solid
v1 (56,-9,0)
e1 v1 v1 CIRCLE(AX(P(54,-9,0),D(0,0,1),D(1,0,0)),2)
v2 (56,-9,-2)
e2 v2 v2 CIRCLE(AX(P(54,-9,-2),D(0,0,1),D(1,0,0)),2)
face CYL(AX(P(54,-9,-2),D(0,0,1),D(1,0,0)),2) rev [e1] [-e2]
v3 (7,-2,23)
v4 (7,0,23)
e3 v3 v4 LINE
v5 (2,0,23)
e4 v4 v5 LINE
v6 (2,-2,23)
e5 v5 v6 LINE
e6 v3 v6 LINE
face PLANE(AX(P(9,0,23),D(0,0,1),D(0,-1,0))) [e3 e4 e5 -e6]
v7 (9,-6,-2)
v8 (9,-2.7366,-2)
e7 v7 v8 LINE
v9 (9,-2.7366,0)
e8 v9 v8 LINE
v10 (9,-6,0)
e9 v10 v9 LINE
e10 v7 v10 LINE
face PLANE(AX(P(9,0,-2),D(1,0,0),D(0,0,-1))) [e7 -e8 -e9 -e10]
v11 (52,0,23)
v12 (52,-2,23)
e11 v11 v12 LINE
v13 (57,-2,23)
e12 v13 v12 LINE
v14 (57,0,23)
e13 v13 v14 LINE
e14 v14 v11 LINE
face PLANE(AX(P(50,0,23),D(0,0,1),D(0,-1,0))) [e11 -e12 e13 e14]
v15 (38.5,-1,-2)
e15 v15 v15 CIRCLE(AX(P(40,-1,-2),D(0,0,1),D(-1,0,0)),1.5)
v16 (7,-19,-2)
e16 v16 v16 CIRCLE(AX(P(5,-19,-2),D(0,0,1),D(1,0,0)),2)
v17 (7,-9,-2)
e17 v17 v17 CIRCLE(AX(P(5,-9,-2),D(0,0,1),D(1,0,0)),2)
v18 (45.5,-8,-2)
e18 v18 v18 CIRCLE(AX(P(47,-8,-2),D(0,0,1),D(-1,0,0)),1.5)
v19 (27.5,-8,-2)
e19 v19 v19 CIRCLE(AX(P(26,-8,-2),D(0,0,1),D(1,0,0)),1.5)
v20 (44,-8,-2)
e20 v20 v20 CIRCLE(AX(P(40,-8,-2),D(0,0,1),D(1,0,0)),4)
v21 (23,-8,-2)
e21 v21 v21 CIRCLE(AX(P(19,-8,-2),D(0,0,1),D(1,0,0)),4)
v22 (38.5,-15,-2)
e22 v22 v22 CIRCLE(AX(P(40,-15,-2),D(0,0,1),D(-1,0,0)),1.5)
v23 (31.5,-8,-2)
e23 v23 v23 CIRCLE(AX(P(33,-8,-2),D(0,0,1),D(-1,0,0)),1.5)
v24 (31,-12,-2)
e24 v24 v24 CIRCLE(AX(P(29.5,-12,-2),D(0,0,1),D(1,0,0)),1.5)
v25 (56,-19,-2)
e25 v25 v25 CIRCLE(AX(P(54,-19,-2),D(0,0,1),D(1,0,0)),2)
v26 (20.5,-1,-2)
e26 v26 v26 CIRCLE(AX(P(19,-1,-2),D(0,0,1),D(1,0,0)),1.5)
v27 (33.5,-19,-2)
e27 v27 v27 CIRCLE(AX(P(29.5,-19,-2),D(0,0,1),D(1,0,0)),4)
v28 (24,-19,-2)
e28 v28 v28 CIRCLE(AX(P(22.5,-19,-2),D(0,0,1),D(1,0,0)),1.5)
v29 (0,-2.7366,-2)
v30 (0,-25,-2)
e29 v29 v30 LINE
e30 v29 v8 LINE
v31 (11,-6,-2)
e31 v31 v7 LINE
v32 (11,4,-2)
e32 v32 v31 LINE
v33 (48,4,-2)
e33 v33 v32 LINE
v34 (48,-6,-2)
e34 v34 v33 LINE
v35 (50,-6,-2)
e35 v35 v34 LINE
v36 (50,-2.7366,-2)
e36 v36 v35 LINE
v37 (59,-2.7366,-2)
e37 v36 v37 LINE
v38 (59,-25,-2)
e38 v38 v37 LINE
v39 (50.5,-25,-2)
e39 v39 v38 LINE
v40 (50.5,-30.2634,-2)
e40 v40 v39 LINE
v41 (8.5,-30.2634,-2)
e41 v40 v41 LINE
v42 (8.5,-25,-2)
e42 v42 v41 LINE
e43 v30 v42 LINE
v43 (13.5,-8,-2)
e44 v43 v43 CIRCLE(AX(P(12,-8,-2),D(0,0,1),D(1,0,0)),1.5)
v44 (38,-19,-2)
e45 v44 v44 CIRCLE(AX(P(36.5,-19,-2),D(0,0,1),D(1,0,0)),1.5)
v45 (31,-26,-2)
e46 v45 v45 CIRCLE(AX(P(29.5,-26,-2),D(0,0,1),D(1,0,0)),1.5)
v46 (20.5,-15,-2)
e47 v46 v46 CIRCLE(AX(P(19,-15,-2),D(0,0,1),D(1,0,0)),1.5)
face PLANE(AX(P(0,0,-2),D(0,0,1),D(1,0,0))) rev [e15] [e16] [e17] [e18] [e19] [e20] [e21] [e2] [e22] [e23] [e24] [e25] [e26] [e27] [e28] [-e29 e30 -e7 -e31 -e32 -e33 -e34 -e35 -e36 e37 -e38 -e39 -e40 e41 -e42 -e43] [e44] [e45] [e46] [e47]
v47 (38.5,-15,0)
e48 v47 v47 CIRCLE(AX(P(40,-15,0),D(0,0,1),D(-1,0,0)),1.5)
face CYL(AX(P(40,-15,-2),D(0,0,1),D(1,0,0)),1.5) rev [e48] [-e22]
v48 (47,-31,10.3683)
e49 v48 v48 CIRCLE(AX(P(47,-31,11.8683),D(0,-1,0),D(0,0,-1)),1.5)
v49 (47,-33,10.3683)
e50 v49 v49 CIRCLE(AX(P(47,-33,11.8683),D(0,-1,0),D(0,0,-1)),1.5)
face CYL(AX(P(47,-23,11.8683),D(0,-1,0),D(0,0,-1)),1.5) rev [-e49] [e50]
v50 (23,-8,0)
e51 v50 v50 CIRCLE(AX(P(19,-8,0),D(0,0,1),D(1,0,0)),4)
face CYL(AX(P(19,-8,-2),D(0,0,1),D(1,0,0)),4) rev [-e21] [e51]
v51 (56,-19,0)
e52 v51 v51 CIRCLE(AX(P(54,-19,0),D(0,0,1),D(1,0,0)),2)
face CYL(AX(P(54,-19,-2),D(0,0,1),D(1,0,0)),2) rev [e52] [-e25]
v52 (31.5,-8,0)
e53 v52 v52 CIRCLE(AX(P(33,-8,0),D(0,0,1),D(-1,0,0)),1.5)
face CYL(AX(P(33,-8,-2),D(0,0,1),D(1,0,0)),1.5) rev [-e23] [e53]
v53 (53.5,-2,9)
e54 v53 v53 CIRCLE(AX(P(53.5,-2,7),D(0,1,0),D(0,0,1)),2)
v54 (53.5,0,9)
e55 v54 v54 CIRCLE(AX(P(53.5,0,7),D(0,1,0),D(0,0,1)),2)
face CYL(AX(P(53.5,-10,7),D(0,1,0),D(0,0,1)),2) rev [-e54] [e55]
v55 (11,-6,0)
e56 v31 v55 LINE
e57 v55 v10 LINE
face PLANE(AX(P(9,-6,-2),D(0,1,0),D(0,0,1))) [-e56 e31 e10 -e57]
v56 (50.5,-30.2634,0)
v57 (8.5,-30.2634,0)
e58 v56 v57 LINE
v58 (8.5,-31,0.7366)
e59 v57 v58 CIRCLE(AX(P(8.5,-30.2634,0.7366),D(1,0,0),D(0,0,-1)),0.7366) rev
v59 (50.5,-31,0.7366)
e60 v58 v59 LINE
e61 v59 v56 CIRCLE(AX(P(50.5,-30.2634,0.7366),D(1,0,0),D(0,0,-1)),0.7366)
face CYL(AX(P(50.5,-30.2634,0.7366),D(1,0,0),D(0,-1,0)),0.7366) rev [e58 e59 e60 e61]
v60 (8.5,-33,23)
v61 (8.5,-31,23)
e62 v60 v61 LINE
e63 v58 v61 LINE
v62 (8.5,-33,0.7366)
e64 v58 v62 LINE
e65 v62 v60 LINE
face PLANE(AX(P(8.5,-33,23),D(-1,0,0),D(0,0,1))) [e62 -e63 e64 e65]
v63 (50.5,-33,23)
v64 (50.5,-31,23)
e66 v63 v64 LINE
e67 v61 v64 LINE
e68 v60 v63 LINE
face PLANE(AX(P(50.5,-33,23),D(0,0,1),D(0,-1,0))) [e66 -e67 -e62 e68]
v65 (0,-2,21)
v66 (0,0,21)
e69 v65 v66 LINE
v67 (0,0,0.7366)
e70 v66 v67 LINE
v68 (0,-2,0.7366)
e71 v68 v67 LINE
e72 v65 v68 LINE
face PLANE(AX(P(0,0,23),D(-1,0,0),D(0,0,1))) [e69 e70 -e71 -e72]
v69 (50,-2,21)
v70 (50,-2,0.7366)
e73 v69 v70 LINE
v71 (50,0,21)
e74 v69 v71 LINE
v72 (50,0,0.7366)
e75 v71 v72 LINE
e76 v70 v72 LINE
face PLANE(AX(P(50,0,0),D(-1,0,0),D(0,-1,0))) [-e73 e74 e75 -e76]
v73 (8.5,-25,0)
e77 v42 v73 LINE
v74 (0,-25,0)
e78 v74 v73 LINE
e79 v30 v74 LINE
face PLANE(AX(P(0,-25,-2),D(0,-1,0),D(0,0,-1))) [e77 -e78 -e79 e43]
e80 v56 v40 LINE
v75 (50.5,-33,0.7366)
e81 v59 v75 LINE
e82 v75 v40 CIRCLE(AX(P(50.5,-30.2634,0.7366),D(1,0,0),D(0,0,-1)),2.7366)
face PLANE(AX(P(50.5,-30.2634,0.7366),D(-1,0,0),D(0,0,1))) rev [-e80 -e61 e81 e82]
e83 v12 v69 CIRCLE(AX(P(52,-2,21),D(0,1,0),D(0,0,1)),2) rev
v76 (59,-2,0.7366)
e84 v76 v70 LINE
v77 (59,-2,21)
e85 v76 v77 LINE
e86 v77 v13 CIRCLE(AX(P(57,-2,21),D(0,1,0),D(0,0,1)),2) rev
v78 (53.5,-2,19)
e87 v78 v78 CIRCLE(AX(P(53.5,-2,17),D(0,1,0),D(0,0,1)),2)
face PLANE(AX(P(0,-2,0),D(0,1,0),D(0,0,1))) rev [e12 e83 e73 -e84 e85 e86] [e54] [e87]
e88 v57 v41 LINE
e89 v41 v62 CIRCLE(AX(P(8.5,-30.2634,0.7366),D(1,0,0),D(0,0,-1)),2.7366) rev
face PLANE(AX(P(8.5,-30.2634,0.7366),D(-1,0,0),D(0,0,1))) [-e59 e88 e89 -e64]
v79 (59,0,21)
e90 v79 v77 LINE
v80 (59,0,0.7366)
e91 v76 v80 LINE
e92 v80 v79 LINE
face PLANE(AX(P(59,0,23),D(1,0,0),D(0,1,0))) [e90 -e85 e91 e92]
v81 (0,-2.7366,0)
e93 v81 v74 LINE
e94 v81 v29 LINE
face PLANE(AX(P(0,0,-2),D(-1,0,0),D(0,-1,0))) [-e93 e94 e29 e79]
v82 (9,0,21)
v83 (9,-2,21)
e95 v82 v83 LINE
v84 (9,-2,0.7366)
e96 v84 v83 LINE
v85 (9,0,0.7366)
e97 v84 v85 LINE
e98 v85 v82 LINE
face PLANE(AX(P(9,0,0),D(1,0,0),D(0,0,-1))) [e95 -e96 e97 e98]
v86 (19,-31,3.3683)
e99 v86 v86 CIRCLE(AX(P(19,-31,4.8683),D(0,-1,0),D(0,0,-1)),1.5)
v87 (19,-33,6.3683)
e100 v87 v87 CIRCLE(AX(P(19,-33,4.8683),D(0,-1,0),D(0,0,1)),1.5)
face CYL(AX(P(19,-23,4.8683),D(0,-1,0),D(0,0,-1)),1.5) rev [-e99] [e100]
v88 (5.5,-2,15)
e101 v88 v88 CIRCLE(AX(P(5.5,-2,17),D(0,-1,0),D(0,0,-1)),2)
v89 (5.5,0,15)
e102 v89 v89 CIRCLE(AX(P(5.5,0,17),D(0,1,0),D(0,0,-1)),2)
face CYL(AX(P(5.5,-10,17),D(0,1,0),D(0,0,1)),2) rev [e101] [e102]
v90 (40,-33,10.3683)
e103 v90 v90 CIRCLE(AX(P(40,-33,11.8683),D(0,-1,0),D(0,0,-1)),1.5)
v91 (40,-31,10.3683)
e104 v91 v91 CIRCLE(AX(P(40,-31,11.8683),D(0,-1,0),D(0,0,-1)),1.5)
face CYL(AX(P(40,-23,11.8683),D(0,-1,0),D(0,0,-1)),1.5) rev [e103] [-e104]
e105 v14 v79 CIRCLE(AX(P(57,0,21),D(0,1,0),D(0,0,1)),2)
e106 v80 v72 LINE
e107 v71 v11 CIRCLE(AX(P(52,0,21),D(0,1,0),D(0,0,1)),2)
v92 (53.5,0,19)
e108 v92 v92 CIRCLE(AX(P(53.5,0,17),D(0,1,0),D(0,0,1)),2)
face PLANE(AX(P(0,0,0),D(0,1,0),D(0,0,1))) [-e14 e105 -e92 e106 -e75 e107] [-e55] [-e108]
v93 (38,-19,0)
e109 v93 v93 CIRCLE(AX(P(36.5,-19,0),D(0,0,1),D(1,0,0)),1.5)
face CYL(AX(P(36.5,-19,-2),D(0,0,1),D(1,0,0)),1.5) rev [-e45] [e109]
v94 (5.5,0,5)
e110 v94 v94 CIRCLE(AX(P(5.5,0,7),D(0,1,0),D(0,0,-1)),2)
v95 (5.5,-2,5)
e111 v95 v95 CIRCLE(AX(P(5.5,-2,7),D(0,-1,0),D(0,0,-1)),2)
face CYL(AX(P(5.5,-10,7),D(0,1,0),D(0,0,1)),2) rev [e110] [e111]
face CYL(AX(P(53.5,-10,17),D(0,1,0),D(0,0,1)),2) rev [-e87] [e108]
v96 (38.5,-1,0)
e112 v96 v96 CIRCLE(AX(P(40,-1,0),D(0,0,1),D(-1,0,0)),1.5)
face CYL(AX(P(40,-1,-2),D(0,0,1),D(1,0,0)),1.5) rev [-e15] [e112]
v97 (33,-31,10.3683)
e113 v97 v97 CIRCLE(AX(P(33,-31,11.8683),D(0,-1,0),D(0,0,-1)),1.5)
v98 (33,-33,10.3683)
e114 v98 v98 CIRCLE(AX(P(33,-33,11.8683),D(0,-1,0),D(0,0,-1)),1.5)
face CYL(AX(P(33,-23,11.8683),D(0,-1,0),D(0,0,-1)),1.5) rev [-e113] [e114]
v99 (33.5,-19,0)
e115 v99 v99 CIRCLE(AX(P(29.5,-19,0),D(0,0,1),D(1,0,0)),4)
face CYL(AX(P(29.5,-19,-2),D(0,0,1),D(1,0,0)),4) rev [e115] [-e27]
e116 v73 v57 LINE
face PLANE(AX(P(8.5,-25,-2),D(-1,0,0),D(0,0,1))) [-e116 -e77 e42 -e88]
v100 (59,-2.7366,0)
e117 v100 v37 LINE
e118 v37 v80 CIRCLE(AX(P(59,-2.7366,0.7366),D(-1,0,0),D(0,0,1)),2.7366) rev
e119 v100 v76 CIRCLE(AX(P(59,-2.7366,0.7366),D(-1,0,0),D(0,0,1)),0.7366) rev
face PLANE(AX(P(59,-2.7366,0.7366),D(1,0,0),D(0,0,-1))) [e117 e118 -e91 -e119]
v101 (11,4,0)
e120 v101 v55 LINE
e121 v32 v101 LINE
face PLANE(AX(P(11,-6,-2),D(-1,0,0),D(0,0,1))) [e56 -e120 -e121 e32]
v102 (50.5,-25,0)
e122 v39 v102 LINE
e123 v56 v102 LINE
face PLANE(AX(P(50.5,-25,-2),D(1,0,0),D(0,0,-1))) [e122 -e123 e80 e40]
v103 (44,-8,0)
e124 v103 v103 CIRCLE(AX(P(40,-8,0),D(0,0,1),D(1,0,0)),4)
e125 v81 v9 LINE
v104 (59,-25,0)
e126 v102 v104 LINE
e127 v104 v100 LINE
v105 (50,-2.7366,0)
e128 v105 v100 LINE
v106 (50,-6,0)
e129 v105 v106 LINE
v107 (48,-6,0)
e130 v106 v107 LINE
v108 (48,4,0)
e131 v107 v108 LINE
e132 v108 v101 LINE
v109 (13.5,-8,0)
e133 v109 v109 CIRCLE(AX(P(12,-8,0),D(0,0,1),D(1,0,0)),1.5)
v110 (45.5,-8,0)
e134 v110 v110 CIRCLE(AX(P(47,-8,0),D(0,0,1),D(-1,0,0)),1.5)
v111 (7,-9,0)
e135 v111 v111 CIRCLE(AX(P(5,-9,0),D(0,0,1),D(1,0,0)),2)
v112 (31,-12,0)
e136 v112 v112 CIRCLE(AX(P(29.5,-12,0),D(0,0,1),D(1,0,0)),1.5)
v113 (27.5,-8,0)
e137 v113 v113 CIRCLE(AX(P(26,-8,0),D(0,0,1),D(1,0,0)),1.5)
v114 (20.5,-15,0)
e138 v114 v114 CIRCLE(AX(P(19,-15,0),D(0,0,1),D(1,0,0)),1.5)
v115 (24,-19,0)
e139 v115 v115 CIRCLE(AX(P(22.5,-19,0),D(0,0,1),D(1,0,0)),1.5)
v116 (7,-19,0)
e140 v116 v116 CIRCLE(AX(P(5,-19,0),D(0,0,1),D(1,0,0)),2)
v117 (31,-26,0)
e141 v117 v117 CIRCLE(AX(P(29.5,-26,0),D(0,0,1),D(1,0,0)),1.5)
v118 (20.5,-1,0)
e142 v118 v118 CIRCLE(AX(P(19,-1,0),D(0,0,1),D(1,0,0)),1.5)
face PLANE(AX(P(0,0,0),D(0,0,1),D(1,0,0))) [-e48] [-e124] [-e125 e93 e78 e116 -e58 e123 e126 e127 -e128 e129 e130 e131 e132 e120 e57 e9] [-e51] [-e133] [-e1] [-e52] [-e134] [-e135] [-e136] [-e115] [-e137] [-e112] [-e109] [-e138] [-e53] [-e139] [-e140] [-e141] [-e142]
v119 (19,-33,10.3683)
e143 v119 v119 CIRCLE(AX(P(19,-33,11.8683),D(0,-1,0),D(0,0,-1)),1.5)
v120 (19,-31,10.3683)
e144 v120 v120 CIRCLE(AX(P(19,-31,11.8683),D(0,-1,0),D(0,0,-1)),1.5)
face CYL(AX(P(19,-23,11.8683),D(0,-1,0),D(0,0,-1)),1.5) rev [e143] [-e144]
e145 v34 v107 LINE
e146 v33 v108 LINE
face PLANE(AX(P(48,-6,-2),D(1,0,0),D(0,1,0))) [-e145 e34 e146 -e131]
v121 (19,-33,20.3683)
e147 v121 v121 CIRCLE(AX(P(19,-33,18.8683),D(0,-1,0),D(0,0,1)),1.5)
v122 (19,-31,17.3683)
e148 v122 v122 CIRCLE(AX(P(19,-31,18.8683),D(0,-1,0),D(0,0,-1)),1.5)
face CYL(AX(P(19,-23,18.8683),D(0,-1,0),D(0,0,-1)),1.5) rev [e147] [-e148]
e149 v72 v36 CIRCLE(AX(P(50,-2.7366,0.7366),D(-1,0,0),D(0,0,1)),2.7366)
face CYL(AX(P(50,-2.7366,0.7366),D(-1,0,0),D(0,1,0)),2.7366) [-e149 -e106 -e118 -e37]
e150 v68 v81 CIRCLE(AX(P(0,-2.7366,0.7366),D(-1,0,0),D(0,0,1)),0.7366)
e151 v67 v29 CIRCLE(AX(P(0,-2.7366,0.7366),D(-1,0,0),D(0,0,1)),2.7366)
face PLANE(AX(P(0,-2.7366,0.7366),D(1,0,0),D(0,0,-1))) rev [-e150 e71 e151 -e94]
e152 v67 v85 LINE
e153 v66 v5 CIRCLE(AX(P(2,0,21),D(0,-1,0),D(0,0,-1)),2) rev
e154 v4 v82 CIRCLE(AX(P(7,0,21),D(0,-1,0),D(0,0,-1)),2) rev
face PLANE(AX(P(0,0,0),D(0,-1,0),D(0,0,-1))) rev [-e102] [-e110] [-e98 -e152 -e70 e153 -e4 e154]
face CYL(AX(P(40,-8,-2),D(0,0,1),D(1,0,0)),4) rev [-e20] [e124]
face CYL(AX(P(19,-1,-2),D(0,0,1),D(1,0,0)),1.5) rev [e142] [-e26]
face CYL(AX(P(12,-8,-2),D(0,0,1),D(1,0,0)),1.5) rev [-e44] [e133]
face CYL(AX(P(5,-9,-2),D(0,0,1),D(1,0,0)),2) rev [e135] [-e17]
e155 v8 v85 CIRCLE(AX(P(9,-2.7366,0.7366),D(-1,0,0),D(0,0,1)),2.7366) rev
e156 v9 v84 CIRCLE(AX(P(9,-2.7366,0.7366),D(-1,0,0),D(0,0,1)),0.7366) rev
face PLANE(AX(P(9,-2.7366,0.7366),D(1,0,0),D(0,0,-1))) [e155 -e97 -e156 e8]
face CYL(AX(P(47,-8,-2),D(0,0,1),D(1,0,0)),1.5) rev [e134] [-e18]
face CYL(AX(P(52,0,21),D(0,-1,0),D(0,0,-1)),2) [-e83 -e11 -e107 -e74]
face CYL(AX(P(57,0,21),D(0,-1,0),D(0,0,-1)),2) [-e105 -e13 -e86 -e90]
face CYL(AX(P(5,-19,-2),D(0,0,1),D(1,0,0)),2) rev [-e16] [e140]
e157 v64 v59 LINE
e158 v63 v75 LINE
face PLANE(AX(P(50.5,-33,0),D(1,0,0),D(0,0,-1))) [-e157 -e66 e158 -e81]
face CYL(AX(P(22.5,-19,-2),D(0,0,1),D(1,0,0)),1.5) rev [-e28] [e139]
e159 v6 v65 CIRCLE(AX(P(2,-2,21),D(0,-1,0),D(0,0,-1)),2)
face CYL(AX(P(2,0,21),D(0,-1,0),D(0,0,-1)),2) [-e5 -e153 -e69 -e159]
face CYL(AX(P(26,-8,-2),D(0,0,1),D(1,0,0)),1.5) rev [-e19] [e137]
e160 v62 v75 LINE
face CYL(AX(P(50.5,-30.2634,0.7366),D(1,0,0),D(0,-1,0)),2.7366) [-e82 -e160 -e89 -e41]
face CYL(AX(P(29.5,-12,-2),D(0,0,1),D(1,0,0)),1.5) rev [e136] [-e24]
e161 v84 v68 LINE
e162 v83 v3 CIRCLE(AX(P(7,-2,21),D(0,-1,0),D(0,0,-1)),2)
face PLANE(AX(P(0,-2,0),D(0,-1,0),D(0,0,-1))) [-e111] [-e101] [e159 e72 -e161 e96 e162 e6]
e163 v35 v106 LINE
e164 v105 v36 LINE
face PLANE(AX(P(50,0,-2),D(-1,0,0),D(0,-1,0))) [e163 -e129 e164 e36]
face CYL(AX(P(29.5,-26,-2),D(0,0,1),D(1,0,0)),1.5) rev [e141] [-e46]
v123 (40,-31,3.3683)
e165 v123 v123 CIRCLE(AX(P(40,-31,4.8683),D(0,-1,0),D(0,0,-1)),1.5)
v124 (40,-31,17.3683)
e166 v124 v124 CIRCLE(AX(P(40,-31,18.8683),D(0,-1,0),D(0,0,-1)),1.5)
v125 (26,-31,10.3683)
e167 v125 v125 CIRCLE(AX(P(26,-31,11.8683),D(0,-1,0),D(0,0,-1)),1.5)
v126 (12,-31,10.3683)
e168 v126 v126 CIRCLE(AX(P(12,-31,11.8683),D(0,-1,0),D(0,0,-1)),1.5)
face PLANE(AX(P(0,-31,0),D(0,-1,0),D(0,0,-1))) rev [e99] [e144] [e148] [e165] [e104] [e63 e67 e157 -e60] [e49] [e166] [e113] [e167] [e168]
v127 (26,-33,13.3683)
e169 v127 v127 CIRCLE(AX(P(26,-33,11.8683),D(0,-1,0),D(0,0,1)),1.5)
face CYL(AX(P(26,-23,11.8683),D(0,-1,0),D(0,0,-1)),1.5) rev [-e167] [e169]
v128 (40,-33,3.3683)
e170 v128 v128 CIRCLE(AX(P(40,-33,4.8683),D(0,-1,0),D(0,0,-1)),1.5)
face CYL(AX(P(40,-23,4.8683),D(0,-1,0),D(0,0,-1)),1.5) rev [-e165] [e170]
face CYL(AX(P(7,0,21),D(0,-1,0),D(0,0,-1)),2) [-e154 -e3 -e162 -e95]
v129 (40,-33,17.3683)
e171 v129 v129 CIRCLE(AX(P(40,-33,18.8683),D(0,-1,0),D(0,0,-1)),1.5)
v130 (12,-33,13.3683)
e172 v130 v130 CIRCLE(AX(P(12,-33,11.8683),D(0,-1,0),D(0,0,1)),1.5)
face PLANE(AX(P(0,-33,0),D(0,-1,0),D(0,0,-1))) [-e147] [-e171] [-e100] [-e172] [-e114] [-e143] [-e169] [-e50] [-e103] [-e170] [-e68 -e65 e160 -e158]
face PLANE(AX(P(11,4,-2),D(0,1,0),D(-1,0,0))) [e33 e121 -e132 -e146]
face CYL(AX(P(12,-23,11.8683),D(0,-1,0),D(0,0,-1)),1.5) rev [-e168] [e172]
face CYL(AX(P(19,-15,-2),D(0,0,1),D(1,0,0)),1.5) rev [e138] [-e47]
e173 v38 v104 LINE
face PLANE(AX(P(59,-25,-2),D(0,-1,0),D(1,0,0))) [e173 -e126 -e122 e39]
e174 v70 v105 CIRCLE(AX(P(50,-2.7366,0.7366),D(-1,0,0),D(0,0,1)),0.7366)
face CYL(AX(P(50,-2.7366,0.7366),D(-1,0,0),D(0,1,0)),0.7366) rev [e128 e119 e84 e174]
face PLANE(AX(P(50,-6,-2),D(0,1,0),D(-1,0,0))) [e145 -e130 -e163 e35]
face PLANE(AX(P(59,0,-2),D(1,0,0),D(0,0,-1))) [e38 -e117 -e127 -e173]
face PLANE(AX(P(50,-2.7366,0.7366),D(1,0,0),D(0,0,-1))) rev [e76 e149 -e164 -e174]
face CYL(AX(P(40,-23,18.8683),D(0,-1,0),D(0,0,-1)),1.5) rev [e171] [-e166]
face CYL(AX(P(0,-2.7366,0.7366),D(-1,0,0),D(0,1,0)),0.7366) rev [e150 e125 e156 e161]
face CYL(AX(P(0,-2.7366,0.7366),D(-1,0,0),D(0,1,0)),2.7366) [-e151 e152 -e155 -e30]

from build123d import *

# Parameters (mm, degrees)
SKETCH_1_R                         = 4
SKETCH_1_R_2                       = 1.5
SKETCH_1_R_3                       = 2
SM_BASE_FLANGE_1_DEPTH             = 2
SM_EDGE_FLANGE_1_STRIP_W           = 9.4732
SM_EDGE_FLANGE_1_STRIP_H           = 2
SM_EDGE_FLANGE_1_STRIP_CUT_DEPTH   = 9
SM_EDGE_FLANGE_1_STRIP_2_W         = 9.4732
SM_EDGE_FLANGE_1_STRIP_2_H         = 2
SM_EDGE_FLANGE_1_STRIP_CUT_2_DEPTH = 9
SM_EDGE_FLANGE_1_DEPTH             = 9
SM_EDGE_FLANGE_1_BEND_DEPTH        = 9
SM_EDGE_FLANGE_2_STRIP_W           = 9.4732
SM_EDGE_FLANGE_2_STRIP_H           = 2
SM_EDGE_FLANGE_2_STRIP_CUT_DEPTH   = 42
SM_EDGE_FLANGE_2_DEPTH             = 42
SKETCH_15_R                        = 1.5
CUT_EXTRUDE_1_DEPTH                = 10
SKETCH_16_R                        = 2
CUT_EXTRUDE_2_DEPTH                = 10
FILLET_1_R                         = 2


# Sheet-metal steps are written as plain solids
with BuildPart() as part:
    # Sketch 1 → 基体-法兰1 (new body)
    with BuildSketch(Plane.XY):
        Polygon((0, 0), (9, 0), (9, -6), (11, -6), (11, 4), (48, 4), (48, -6), (50, -6), (50, 0), (59, 0), (59, -25), (50.5, -25), (50.5, -33), (8.5, -33), (8.5, -25), (0, -25), align=None)
        with Locations((19, -8)):
            Circle(SKETCH_1_R, mode=Mode.SUBTRACT)
        with Locations((40, -8)):
            Circle(SKETCH_1_R, mode=Mode.SUBTRACT)
        with Locations((29.5, -19)):
            Circle(SKETCH_1_R, mode=Mode.SUBTRACT)
        with Locations((19, -1)):
            Circle(SKETCH_1_R_2, mode=Mode.SUBTRACT)
        with Locations((19, -15)):
            Circle(SKETCH_1_R_2, mode=Mode.SUBTRACT)
        with Locations((26, -8)):
            Circle(SKETCH_1_R_2, mode=Mode.SUBTRACT)
        with Locations((12, -8)):
            Circle(SKETCH_1_R_2, mode=Mode.SUBTRACT)
        with Locations(Location((33, -8, 0), (0, 0, 180))):
            Circle(SKETCH_1_R_2, mode=Mode.SUBTRACT)
        with Locations(Location((40, -15, 0), (0, 0, 180))):
            Circle(SKETCH_1_R_2, mode=Mode.SUBTRACT)
        with Locations(Location((47, -8, 0), (0, 0, 180))):
            Circle(SKETCH_1_R_2, mode=Mode.SUBTRACT)
        with Locations(Location((40, -1, 0), (0, 0, 180))):
            Circle(SKETCH_1_R_2, mode=Mode.SUBTRACT)
        with Locations((29.5, -12)):
            Circle(SKETCH_1_R_2, mode=Mode.SUBTRACT)
        with Locations((36.5, -19)):
            Circle(SKETCH_1_R_2, mode=Mode.SUBTRACT)
        with Locations((29.5, -26)):
            Circle(SKETCH_1_R_2, mode=Mode.SUBTRACT)
        with Locations((22.5, -19)):
            Circle(SKETCH_1_R_2, mode=Mode.SUBTRACT)
        with Locations((54, -9)):
            Circle(SKETCH_1_R_3, mode=Mode.SUBTRACT)
        with Locations((54, -19)):
            Circle(SKETCH_1_R_3, mode=Mode.SUBTRACT)
        with Locations((5, -19)):
            Circle(SKETCH_1_R_3, mode=Mode.SUBTRACT)
        with Locations((5, -9)):
            Circle(SKETCH_1_R_3, mode=Mode.SUBTRACT)
    extrude(amount=-SM_BASE_FLANGE_1_DEPTH)

    # 边线-法兰1 strip (across the edge) → 边线-法兰1 strip cut (cut)
    with BuildSketch(Plane(origin=(59, 0, 0), x_dir=(0, -1, 0), z_dir=(-1, 0, 0))):
        with Locations((-2, -1)):
            Rectangle(SM_EDGE_FLANGE_1_STRIP_W, SM_EDGE_FLANGE_1_STRIP_H)
    extrude(amount=SM_EDGE_FLANGE_1_STRIP_CUT_DEPTH, mode=Mode.SUBTRACT)

    # 边线-法兰1 strip 2 (across the edge) → 边线-法兰1 strip cut 2 (cut)
    with BuildSketch(Plane(origin=(9, 0, 0), x_dir=(0, -1, 0), z_dir=(-1, 0, 0))):
        with Locations((-2, -1)):
            Rectangle(SM_EDGE_FLANGE_1_STRIP_2_W, SM_EDGE_FLANGE_1_STRIP_2_H)
    extrude(amount=SM_EDGE_FLANGE_1_STRIP_CUT_2_DEPTH, mode=Mode.SUBTRACT)

    # 边线-法兰1 section (across the edge) → 边线-法兰1 (add)
    with BuildSketch(Plane(origin=(59, 0, 0), x_dir=(0, -1, 0), z_dir=(-1, 0, 0))):
        with BuildLine():
            Line((0, 0.7366), (0, 23))
            Line((0, 23), (2, 23))
            Line((2, 23), (2, 0.7366))
            ThreePointArc((2, 0.7366), (2.215745145, 0.215745145), (2.7366, 0))
            Line((2.7366, 0), (2.7366, -2))
            ThreePointArc((2.7366, -2), (0.801531583, -1.198468417), (0, 0.7366))
        make_face()
    extrude(amount=SM_EDGE_FLANGE_1_DEPTH)

    # 边线-法兰1 section 2 (across the edge) → 边线-法兰1 bend (add)
    with BuildSketch(Plane(origin=(9, 0, 0), x_dir=(0, -1, 0), z_dir=(-1, 0, 0))):
        with BuildLine():
            Line((0, 0.7366), (0, 23))
            Line((0, 23), (2, 23))
            Line((2, 23), (2, 0.7366))
            ThreePointArc((2, 0.7366), (2.215745145, 0.215745145), (2.7366, 0))
            Line((2.7366, 0), (2.7366, -2))
            ThreePointArc((2.7366, -2), (0.801531583, -1.198468417), (0, 0.7366))
        make_face()
    extrude(amount=SM_EDGE_FLANGE_1_BEND_DEPTH)

    # 边线-法兰2 strip (across the edge) → 边线-法兰2 strip cut (cut)
    with BuildSketch(Plane(origin=(8.5, -33, 0), x_dir=(0, 1, 0), z_dir=(1, 0, 0))):
        with Locations((-2, -1)):
            Rectangle(SM_EDGE_FLANGE_2_STRIP_W, SM_EDGE_FLANGE_2_STRIP_H)
    extrude(amount=SM_EDGE_FLANGE_2_STRIP_CUT_DEPTH, mode=Mode.SUBTRACT)

    # 边线-法兰2 section (across the edge) → 边线-法兰2 (add)
    with BuildSketch(Plane(origin=(8.5, -33, 0), x_dir=(0, 1, 0), z_dir=(1, 0, 0))):
        with BuildLine():
            Line((0, 0.7366), (0, 23))
            Line((0, 23), (2, 23))
            Line((2, 23), (2, 0.7366))
            ThreePointArc((2, 0.7366), (2.215745145, 0.215745145), (2.7366, 0))
            Line((2.7366, 0), (2.7366, -2))
            ThreePointArc((2.7366, -2), (0.801531583, -1.198468417), (0, 0.7366))
        make_face()
    extrude(amount=SM_EDGE_FLANGE_2_DEPTH)

    # 草图15 → 切除-拉伸1 (cut)
    with BuildSketch(Plane.XZ.offset(33)):
        with Locations(Location((47, 11.8683, 0), (0, 0, 270))):
            Circle(SKETCH_15_R)
        with Locations(Location((40, 11.8683, 0), (0, 0, 270))):
            Circle(SKETCH_15_R)
        with Locations(Location((33, 11.8683, 0), (0, 0, 270))):
            Circle(SKETCH_15_R)
        with Locations(Location((40, 4.8683, 0), (0, 0, 270))):
            Circle(SKETCH_15_R)
        with Locations(Location((40, 18.8683, 0), (0, 0, 270))):
            Circle(SKETCH_15_R)
        with Locations(Location((12, 11.8683, 0), (0, 0, 270))):
            Circle(SKETCH_15_R)
        with Locations(Location((19, 18.8683, 0), (0, 0, 270))):
            Circle(SKETCH_15_R)
        with Locations(Location((26, 11.8683, 0), (0, 0, 270))):
            Circle(SKETCH_15_R)
        with Locations(Location((19, 4.8683, 0), (0, 0, 270))):
            Circle(SKETCH_15_R)
        with Locations(Location((19, 11.8683, 0), (0, 0, 270))):
            Circle(SKETCH_15_R)
    extrude(amount=-CUT_EXTRUDE_1_DEPTH, mode=Mode.SUBTRACT)

    # 草图16 → 切除-拉伸2 (cut)
    with BuildSketch(Plane(origin=(0, 0, 0), x_dir=(1, 0, 0), z_dir=(0, 1, 0))):
        with Locations(Location((53.5, -17, 0), (0, 0, 270))):
            Circle(SKETCH_16_R)
        with Locations(Location((53.5, -7, 0), (0, 0, 270))):
            Circle(SKETCH_16_R)
        with Locations(Location((5.5, -17, 0), (0, 0, 90))):
            Circle(SKETCH_16_R)
        with Locations(Location((5.5, -7, 0), (0, 0, 90))):
            Circle(SKETCH_16_R)
    extrude(amount=-CUT_EXTRUDE_2_DEPTH, mode=Mode.SUBTRACT)

    # 圆角1
    fillet_1_edges = [part.edges().sort_by_distance(p)[0] for p in [
        (59, -1, 23),
        (50, -1, 23),
        (9, -1, 23),
        (0, -1, 23),
    ]]
    fillet(fillet_1_edges, radius=FILLET_1_R)


solid = part.part
